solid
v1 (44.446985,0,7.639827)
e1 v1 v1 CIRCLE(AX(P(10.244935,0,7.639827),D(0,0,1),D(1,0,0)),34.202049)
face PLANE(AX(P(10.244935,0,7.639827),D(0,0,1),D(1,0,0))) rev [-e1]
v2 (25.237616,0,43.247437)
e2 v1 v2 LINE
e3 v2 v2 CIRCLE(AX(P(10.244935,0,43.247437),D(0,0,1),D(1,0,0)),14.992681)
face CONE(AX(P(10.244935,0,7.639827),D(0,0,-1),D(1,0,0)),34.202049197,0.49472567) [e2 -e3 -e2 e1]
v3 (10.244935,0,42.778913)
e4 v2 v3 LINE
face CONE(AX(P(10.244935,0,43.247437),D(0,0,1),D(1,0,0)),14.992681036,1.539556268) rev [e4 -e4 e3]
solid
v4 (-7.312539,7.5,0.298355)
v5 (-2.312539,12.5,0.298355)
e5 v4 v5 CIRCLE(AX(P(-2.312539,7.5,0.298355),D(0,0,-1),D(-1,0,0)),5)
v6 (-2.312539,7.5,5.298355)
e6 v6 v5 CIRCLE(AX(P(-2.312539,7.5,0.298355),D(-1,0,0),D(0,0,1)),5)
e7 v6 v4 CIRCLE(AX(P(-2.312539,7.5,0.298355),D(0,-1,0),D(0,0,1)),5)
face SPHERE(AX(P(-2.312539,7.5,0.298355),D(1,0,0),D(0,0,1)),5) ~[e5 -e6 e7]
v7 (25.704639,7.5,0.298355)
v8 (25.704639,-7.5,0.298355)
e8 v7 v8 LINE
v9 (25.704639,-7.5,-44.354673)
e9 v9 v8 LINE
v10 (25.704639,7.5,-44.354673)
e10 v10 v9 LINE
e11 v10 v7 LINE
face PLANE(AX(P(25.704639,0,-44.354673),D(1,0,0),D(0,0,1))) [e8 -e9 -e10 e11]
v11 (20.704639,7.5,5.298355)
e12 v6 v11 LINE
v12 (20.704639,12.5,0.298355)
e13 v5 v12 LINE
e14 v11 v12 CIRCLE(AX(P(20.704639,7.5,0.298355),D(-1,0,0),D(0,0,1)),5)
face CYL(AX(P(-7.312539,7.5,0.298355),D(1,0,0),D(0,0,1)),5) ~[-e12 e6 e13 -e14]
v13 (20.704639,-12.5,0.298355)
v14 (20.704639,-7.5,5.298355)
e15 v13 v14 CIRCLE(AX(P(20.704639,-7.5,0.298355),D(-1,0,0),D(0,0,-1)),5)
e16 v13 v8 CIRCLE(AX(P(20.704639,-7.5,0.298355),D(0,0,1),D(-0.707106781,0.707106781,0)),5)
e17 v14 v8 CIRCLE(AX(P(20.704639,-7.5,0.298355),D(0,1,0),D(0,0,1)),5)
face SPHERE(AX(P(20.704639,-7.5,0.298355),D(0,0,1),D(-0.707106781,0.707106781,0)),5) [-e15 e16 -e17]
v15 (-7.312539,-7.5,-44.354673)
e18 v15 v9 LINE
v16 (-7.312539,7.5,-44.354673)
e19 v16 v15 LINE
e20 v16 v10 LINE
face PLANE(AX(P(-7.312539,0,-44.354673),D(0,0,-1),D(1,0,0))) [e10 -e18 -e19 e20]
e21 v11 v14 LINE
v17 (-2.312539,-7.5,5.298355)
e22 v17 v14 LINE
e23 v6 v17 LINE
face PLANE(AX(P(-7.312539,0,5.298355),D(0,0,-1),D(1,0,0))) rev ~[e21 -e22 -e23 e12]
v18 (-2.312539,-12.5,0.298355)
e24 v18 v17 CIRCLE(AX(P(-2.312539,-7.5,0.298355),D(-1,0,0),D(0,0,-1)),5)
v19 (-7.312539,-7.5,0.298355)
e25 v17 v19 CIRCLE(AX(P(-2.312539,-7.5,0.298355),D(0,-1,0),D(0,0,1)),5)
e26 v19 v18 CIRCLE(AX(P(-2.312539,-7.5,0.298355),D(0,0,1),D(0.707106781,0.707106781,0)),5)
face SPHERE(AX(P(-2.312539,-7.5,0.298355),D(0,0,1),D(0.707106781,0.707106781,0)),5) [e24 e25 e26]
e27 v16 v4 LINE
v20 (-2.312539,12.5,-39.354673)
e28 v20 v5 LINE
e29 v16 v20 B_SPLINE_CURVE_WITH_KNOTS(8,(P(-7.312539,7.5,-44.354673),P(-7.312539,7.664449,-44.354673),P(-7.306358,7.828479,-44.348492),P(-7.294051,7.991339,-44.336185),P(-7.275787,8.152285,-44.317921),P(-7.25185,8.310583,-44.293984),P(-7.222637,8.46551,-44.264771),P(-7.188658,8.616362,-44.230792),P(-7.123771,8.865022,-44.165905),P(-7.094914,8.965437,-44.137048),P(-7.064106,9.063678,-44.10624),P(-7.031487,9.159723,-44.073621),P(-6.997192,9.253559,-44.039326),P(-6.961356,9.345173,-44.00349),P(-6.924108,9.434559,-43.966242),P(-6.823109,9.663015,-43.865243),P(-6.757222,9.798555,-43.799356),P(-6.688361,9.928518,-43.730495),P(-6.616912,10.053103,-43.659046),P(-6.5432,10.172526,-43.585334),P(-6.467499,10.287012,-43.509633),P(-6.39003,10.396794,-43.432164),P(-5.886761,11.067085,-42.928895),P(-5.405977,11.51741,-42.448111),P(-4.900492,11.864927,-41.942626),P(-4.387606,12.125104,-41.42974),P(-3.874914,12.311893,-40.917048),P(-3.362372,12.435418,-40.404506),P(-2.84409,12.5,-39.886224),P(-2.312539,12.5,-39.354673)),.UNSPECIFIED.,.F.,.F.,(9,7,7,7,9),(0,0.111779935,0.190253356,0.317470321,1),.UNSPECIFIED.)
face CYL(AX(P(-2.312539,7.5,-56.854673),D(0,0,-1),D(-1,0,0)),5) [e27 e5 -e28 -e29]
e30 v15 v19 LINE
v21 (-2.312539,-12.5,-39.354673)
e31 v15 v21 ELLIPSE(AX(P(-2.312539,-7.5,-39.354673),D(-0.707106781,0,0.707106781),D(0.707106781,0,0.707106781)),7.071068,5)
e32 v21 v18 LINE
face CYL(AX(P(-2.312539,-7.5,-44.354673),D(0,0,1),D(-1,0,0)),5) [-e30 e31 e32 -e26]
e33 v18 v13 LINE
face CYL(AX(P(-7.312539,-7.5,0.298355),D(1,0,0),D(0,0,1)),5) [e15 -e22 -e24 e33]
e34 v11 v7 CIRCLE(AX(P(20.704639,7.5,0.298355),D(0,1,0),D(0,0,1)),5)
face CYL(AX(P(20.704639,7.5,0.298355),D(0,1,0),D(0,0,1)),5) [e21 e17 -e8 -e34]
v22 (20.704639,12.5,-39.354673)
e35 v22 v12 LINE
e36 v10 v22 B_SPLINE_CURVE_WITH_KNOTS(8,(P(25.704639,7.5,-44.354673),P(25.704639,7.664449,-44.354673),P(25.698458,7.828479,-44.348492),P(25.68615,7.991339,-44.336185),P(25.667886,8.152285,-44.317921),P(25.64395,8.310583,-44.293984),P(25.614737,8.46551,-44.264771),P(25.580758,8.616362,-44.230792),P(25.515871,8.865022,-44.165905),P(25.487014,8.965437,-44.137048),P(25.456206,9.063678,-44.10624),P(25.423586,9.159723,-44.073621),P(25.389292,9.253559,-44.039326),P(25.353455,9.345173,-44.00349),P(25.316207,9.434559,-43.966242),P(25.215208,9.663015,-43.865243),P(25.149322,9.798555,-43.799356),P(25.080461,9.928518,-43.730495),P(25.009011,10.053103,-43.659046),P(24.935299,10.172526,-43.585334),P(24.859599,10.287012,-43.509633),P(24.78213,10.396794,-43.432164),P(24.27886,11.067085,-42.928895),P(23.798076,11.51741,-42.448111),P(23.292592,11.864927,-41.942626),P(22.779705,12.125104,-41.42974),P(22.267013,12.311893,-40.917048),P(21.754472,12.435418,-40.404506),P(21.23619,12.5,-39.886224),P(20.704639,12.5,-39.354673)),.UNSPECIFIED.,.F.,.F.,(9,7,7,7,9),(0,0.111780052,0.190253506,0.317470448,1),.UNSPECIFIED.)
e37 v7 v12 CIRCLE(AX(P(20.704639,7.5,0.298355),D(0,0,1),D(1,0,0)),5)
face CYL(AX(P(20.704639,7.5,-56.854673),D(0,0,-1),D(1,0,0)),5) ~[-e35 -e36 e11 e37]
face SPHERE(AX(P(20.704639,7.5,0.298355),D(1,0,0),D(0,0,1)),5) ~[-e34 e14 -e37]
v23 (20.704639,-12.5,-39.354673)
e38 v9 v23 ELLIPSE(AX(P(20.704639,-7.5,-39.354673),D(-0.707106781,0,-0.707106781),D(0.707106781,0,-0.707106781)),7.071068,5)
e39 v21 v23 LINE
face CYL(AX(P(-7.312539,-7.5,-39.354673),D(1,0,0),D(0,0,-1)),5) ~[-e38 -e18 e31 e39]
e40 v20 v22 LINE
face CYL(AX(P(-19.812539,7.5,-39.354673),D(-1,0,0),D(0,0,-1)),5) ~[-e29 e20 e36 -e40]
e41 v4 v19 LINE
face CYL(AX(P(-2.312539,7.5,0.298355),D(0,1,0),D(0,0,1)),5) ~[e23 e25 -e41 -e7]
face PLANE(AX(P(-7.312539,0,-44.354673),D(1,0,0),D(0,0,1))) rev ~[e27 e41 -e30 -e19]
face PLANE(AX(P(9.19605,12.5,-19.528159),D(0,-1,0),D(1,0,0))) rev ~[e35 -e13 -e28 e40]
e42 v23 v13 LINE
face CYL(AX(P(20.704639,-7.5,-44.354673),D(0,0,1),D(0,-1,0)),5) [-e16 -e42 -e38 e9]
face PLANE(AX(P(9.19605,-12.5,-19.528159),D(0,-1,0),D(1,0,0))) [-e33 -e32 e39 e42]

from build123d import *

# Parameters (mm, degrees)
F2_W         = 33.0171785317
F2_H         = 49.6530286036
F3_DEPTH     = 12.5
F4_R         = 5
F5_R         = 5
F6_T1_DEPTH  = 57.1530286036
F6_T3_DEPTH  = 58.0171785317
F6_T5_DEPTH  = 15
F6_S9_W      = 5
F6_S9_H      = 5
F6_T10_DEPTH = 5
F6_S15_W     = 5
F6_S15_H     = 5
F6_T16_DEPTH = 5
F6_T20_ANGLE = 90
F6_T22_ANGLE = 90


# Not quite as in the source:
# - a fillet or chamfer that OpenCascade refuses, or shapes differently, is made with other operations: its cross-section is extruded or revolved along the edge and cut away or added


with BuildPart() as f1:
    # F0 (on Front) → F1 (revolve)
    with BuildSketch(Plane.XZ):
        Polygon((10.2449354299, 42.7789126646), (10.2449354299, 7.6398269811), (44.4469846271, 7.6398269811), (25.2376164656, 43.2474373302), align=None)
    revolve(axis=Axis((10.2449354299, 0, 25.2093698228), (0, 0, 1)))


with BuildPart() as f3:
    # F2 (on Front) → F3 (new body, symmetric)
    with BuildSketch(Plane.XZ):
        with Locations((9.1960497666, -19.5281591732)):
            Rectangle(F2_W, F2_H)
    extrude(amount=F3_DEPTH, both=True)

    # F4
    f4_edges = [f3.edges().sort_by_distance(p)[0] for p in [
        (9.19605, 12.5, 5.298355),
    ]]
    fillet(f4_edges, radius=F4_R)

    # F5
    f5_edges = [f3.edges().sort_by_distance(p)[0] for p in [
        (9.19605, -12.5, 5.298355),
        (-7.312539, -12.5, -19.528159),
        (9.19605, -12.5, -44.354673),
        (25.704639, -12.5, -19.528159),
    ]]
    fillet(f5_edges, radius=F5_R)

    # F6: fillet of radius 5 on 4 edges, made by hand

    # F6_s2 → F6_t1 (cut)
    with BuildSketch(Plane.XY.offset(-56.854673475)):
        with BuildLine():
            ThreePointArc((-7.3125394993, 7.5), (-5.8480734052, 11.0355339059), (-2.3125394993, 12.5))
            Line((-2.3125394993, 12.5), (-7.3125394993, 12.5))
            Line((-7.3125394993, 12.5), (-7.3125394993, 7.5))
        make_face()
        with BuildLine():
            ThreePointArc((25.7046390325, 7.5), (24.2401729384, 11.0355339059), (20.7046390325, 12.5))
            Line((20.7046390325, 12.5), (25.7046390325, 12.5))
            Line((25.7046390325, 12.5), (25.7046390325, 7.5))
        make_face()
    extrude(amount=F6_T1_DEPTH, mode=Mode.SUBTRACT)

    # F6_s4 → F6_t3 (cut)
    with BuildSketch(Plane.YZ.offset(-19.8125394993)):
        with BuildLine():
            ThreePointArc((7.5, -44.354673475), (11.0355339059, -42.890207381), (12.5, -39.354673475))
            Line((12.5, -39.354673475), (12.5, -44.354673475))
            Line((12.5, -44.354673475), (7.5, -44.354673475))
        make_face()
    extrude(amount=F6_T3_DEPTH, mode=Mode.SUBTRACT)

    # F6_s6 → F6_t5 (cut)
    with BuildSketch(Plane.XZ.offset(-7.5)):
        with BuildLine():
            ThreePointArc((20.7046390325, 5.2983551286), (24.2401729384, 3.8338890345), (25.7046390325, 0.2983551286))
            Line((25.7046390325, 0.2983551286), (25.7046390325, 5.2983551286))
            Line((25.7046390325, 5.2983551286), (20.7046390325, 5.2983551286))
        make_face()
        with BuildLine():
            ThreePointArc((-2.3125394993, 5.2983551286), (-5.8480734052, 3.8338890345), (-7.3125394993, 0.2983551286))
            Line((-7.3125394993, 0.2983551286), (-7.3125394993, 5.2983551286))
            Line((-7.3125394993, 5.2983551286), (-2.3125394993, 5.2983551286))
        make_face()
    extrude(amount=F6_T5_DEPTH, mode=Mode.SUBTRACT)


with BuildPart() as f6_tool8:
    # F6_s9 → F6_t10 (new body)
    with BuildSketch(Plane.XY.offset(0.2983551286)):
        with Locations((23.2046390325, -10)):
            Rectangle(F6_S9_W, F6_S9_H)
    extrude(amount=F6_T10_DEPTH)

    # F6_s11 → F6_t12 (revolve, cut)
    with BuildSketch(Plane(origin=(20.7046390325, -7.5, 0.2983551286), x_dir=(-0.7071067812, 0.7071067812, 0), z_dir=(0.7071067812, 0.7071067812, 0))):
        with BuildLine():
            ThreePointArc((0, -5), (5, 0), (0, 5))
            Line((0, 5), (0, -5))
        make_face()
    revolve(axis=Axis((20.7046390325, -7.5, 0.2983551286), (0, 0, 1)), mode=Mode.SUBTRACT)


with BuildPart() as f3_1:
    add(f3.part)

    # F6_t7: cut F6_tool8
    add(f6_tool8.part, mode=Mode.SUBTRACT)


with BuildPart() as f6_tool14:
    # F6_s15 → F6_t16 (new body)
    with BuildSketch(Plane.XY.offset(0.2983551286)):
        with Locations((-4.8125394993, -10)):
            Rectangle(F6_S15_W, F6_S15_H)
    extrude(amount=F6_T16_DEPTH)

    # F6_s17 → F6_t18 (revolve, cut)
    with BuildSketch(Plane(origin=(-2.3125394993, -7.5, 0.2983551286), x_dir=(0.7071067812, 0.7071067812, 0), z_dir=(0.7071067812, -0.7071067812, 0))):
        with BuildLine():
            ThreePointArc((0, -5), (5, 0), (0, 5))
            Line((0, 5), (0, -5))
        make_face()
    revolve(axis=Axis((-2.3125394993, -7.5, 0.2983551286), (0, 0, 1)), mode=Mode.SUBTRACT)


with BuildPart() as f3_2:
    add(f3_1.part)

    # F6_t13: cut F6_tool14
    add(f6_tool14.part, mode=Mode.SUBTRACT)

    # F6_s19 → F6_t20 (revolve, cut)
    with BuildSketch(Plane.XZ.offset(-7.5)):
        with BuildLine():
            ThreePointArc((20.7046390325, 5.2983551286), (24.2401729384, 3.8338890345), (25.7046390325, 0.2983551286))
            Line((25.7046390325, 0.2983551286), (25.7046390325, 5.2983551286))
            Line((25.7046390325, 5.2983551286), (20.7046390325, 5.2983551286))
        make_face()
    revolve(axis=Axis((25.7046390325, 7.5, 0.2983551286), (-1, 0, 0)), revolution_arc=F6_T20_ANGLE, mode=Mode.SUBTRACT)

    # F6_s21 → F6_t22 (revolve, cut)
    with BuildSketch(Plane.XZ.offset(-7.5)):
        with BuildLine():
            ThreePointArc((-7.3125394993, 0.2983551286), (-5.8480734052, 3.8338890345), (-2.3125394993, 5.2983551286))
            Line((-2.3125394993, 5.2983551286), (-7.3125394993, 5.2983551286))
            Line((-7.3125394993, 5.2983551286), (-7.3125394993, 0.2983551286))
        make_face()
    revolve(axis=Axis((-7.3125394993, 7.5, 0.2983551286), (-1, 0, 0)), revolution_arc=F6_T22_ANGLE, mode=Mode.SUBTRACT)


solid = Compound([f1.part, f3_2.part])
